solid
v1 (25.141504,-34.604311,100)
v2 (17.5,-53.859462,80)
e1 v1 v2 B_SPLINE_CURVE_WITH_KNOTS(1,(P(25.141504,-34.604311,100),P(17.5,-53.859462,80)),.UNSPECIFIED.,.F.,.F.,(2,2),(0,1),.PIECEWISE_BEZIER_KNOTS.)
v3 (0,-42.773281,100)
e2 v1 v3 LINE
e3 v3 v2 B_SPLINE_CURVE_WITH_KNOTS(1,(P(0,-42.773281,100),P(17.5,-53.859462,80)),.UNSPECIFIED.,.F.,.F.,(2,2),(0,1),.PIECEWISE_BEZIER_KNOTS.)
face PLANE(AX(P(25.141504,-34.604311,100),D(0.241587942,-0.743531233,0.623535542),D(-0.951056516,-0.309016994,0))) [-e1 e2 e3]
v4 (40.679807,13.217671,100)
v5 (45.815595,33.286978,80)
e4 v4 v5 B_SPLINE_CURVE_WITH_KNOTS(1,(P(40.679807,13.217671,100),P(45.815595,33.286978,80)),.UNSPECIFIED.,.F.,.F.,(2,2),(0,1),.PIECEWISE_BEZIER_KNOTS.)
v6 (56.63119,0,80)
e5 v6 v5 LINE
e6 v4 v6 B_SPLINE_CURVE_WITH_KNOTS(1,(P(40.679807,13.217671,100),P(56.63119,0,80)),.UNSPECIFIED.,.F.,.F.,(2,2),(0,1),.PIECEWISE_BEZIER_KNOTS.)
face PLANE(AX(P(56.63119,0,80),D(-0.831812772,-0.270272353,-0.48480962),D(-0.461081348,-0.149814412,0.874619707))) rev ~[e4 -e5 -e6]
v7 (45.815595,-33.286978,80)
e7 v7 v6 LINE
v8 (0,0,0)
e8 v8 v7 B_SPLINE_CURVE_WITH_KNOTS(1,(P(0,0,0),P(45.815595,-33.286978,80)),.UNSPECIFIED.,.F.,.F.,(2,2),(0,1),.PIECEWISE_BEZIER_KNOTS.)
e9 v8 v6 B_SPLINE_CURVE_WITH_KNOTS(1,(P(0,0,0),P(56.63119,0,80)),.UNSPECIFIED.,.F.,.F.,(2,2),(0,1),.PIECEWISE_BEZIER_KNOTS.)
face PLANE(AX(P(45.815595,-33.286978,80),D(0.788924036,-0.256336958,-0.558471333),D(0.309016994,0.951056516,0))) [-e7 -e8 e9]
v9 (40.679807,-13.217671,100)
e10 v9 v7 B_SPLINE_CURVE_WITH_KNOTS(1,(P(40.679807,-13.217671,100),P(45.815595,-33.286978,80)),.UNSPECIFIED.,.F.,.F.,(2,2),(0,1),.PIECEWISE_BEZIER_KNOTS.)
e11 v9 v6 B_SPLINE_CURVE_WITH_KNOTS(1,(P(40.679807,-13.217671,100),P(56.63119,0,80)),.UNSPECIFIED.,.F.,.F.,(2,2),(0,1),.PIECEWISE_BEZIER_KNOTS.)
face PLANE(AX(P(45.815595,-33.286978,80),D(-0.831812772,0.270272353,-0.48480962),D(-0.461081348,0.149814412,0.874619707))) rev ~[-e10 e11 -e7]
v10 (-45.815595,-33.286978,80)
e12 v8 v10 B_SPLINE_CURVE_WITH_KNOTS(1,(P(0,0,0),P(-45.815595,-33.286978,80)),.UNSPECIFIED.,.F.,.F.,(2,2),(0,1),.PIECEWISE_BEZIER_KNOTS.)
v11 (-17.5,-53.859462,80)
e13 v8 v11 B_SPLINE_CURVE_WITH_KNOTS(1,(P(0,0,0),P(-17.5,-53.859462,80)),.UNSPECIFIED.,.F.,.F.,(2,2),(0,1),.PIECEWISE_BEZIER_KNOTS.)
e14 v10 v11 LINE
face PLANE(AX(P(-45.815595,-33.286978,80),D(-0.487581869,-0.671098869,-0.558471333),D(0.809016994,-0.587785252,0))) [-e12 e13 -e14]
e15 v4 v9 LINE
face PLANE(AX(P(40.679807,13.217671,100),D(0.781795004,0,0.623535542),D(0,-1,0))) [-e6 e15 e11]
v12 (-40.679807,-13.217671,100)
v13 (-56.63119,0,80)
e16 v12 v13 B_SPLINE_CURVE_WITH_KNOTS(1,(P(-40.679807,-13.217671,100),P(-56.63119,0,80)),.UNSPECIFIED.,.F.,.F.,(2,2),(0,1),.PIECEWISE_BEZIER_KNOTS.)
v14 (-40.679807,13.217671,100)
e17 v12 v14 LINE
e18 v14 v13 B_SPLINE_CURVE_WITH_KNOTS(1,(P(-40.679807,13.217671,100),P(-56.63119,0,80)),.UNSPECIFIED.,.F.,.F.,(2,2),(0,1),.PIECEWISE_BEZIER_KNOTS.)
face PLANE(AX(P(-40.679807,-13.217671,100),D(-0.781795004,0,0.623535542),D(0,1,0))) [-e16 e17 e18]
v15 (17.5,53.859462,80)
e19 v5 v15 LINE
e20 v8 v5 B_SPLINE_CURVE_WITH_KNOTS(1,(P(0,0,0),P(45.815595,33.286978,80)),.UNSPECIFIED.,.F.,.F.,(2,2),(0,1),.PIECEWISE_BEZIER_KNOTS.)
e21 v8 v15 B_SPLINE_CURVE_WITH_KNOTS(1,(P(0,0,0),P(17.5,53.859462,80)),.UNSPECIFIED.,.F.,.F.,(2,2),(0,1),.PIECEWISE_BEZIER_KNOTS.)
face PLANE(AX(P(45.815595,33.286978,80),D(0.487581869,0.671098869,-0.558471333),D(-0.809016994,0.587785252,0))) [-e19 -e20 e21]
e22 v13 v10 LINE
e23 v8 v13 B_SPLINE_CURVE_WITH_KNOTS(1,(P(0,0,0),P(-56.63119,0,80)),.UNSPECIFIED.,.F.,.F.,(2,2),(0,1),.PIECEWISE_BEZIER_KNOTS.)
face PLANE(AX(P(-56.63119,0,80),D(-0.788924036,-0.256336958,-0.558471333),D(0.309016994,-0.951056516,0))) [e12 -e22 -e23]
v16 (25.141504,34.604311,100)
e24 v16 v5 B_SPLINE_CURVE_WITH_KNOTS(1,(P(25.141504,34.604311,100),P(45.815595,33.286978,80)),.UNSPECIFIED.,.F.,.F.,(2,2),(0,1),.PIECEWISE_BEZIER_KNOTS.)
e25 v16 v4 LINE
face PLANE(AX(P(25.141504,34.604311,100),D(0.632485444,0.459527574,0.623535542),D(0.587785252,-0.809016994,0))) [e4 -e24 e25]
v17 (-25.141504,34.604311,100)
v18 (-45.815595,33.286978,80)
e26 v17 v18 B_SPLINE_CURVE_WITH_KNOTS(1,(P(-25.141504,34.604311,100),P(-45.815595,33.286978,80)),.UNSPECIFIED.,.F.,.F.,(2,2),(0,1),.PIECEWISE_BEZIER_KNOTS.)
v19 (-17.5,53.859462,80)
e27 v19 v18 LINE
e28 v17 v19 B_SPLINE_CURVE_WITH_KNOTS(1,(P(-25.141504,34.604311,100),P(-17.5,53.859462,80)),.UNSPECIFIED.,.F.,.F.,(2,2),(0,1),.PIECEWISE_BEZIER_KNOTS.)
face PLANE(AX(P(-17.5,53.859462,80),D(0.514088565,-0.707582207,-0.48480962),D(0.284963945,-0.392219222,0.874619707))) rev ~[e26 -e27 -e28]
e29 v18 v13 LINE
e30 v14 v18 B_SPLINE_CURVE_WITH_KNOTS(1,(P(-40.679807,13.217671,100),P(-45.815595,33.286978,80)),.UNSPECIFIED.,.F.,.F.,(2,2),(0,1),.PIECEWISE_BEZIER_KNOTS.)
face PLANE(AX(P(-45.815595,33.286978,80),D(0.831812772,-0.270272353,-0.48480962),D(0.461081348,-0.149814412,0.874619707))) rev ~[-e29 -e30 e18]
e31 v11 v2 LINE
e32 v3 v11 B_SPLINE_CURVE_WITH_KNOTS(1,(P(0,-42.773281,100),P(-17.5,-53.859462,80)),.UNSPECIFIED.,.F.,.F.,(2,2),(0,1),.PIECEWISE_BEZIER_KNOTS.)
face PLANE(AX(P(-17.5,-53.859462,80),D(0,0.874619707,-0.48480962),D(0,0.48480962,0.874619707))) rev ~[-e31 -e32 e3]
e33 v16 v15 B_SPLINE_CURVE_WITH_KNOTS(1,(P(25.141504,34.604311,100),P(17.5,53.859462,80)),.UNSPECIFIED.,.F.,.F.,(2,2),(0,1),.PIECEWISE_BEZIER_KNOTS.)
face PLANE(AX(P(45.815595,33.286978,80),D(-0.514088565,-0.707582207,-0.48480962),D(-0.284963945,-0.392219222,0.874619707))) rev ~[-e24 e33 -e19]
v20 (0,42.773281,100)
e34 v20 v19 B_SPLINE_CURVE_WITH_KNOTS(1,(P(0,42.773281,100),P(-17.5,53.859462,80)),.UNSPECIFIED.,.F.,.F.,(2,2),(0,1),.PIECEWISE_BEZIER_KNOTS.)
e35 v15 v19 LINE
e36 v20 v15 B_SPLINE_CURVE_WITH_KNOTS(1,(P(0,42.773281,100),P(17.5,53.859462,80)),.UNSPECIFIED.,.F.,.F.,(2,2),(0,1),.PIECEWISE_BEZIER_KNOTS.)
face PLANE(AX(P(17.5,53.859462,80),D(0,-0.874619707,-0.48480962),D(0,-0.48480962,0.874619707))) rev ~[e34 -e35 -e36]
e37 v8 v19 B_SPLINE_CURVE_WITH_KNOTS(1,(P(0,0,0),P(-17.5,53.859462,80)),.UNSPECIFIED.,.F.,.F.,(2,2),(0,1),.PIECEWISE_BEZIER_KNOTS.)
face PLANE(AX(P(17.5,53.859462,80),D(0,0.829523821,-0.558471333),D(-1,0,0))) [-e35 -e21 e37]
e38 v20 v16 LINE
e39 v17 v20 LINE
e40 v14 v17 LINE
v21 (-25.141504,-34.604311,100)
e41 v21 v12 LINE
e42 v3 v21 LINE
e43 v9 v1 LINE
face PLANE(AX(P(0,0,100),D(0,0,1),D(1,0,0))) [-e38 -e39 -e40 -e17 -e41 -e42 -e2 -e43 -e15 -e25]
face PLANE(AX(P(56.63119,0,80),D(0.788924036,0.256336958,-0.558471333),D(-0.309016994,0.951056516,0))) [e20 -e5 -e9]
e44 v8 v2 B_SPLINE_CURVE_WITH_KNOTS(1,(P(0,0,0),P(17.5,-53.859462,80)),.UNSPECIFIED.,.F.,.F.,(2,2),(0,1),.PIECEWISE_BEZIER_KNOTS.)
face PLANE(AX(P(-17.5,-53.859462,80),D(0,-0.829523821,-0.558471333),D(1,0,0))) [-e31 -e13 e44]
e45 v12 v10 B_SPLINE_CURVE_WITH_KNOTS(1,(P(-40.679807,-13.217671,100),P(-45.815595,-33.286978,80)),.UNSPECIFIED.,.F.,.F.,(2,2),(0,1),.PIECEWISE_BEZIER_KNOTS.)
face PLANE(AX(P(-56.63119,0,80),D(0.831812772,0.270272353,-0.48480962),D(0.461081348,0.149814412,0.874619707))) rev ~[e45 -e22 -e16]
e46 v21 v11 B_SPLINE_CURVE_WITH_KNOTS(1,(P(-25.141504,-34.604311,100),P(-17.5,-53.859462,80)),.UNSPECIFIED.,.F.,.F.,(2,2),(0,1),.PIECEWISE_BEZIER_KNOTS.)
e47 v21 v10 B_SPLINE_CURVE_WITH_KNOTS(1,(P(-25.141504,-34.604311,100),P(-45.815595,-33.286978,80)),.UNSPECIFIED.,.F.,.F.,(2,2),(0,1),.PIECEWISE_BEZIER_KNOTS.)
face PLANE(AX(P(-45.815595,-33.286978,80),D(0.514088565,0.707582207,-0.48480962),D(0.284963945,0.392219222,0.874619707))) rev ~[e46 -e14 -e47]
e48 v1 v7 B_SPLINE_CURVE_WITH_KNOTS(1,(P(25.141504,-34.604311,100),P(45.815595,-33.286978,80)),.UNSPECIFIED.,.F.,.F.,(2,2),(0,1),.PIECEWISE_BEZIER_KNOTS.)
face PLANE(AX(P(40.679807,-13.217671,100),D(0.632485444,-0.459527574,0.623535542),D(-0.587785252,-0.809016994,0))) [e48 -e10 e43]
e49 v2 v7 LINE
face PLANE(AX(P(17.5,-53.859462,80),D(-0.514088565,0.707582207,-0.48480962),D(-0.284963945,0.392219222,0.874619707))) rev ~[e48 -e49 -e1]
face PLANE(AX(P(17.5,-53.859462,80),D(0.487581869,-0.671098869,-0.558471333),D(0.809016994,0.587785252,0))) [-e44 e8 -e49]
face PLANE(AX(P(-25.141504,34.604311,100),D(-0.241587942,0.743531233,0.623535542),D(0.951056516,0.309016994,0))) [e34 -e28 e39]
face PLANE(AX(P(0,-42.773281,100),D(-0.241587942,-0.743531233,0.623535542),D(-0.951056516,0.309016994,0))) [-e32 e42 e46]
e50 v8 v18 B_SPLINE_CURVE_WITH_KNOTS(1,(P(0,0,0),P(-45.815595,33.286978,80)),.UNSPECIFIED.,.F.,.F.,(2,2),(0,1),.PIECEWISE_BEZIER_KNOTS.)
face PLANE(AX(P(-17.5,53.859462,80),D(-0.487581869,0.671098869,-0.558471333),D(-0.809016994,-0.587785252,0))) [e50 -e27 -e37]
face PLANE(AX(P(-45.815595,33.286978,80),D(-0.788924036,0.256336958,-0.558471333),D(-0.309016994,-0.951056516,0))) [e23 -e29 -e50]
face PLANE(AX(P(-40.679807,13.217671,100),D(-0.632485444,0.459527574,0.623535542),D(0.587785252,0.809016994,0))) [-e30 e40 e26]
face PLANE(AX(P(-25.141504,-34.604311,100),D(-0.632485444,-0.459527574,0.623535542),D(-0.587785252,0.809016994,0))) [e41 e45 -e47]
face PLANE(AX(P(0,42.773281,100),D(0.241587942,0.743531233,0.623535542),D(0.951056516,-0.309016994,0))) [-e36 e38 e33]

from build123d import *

# Parameters (mm, degrees)
F5_DEPTH        = 20
F5_TAPER        = 29
F8_COPIES_COUNT = 10


# Not quite as in the source:
# - a pattern or mirror of a feature is missing from the dataset's text; its kind, count and spacing are read off the source's solid


with BuildPart() as f3:
    # F1 (on offset) → F3 section 0
    with BuildSketch(Plane.XY.offset(80), mode=Mode.PRIVATE) as f3_s0:
        Polygon((45.8155948031, -33.2869780703), (56.6311896062, 0), (45.8155948031, 33.2869780703), (17.5, 53.8594619006), (-17.5, 53.8594619006), (-45.8155948031, 33.2869780703), (-56.6311896062, 0), (-45.8155948031, -33.2869780703), (-17.5, -53.8594619006), (17.5, -53.8594619006), align=None)
    loft([Vertex(0, 0, 0), f3_s0.sketch])

    # F4 (on face) → F5 (join)
    with BuildSketch(Plane.XY.offset(80)):
        Polygon((45.8155948031, -33.2869780703), (56.6311896062, 0), (45.8155948031, 33.2869780703), (17.5, 53.8594619006), (-17.5, 53.8594619006), (-45.8155948031, 33.2869780703), (-56.6311896062, 0), (-45.8155948031, -33.2869780703), (-17.5, -53.8594619006), (17.5, -53.8594619006), align=None)
    extrude(amount=F5_DEPTH, taper=F5_TAPER)

    # F6 (on face) → F8 section 0
    with BuildSketch(Plane.XY.offset(100), mode=Mode.PRIVATE) as f8_s0:
        Polygon((44.9744890431, 0), (40.6798074962, 13.2176706945), (40.6798074962, -13.2176706945), align=None)
    f8 = loft([f8_s0.sketch, Vertex(56.6311896062, 0, 80)], mode=Mode.SUBTRACT)

    # F8_copies: F8 ×10 about axis
    f8_copies_axis = Axis((0, 0, 0), (0, 0, 1))
    for i in range(1, F8_COPIES_COUNT):
        add(f8.rotate(f8_copies_axis, i * 360 / F8_COPIES_COUNT), mode=Mode.SUBTRACT)


solid = f3.part
